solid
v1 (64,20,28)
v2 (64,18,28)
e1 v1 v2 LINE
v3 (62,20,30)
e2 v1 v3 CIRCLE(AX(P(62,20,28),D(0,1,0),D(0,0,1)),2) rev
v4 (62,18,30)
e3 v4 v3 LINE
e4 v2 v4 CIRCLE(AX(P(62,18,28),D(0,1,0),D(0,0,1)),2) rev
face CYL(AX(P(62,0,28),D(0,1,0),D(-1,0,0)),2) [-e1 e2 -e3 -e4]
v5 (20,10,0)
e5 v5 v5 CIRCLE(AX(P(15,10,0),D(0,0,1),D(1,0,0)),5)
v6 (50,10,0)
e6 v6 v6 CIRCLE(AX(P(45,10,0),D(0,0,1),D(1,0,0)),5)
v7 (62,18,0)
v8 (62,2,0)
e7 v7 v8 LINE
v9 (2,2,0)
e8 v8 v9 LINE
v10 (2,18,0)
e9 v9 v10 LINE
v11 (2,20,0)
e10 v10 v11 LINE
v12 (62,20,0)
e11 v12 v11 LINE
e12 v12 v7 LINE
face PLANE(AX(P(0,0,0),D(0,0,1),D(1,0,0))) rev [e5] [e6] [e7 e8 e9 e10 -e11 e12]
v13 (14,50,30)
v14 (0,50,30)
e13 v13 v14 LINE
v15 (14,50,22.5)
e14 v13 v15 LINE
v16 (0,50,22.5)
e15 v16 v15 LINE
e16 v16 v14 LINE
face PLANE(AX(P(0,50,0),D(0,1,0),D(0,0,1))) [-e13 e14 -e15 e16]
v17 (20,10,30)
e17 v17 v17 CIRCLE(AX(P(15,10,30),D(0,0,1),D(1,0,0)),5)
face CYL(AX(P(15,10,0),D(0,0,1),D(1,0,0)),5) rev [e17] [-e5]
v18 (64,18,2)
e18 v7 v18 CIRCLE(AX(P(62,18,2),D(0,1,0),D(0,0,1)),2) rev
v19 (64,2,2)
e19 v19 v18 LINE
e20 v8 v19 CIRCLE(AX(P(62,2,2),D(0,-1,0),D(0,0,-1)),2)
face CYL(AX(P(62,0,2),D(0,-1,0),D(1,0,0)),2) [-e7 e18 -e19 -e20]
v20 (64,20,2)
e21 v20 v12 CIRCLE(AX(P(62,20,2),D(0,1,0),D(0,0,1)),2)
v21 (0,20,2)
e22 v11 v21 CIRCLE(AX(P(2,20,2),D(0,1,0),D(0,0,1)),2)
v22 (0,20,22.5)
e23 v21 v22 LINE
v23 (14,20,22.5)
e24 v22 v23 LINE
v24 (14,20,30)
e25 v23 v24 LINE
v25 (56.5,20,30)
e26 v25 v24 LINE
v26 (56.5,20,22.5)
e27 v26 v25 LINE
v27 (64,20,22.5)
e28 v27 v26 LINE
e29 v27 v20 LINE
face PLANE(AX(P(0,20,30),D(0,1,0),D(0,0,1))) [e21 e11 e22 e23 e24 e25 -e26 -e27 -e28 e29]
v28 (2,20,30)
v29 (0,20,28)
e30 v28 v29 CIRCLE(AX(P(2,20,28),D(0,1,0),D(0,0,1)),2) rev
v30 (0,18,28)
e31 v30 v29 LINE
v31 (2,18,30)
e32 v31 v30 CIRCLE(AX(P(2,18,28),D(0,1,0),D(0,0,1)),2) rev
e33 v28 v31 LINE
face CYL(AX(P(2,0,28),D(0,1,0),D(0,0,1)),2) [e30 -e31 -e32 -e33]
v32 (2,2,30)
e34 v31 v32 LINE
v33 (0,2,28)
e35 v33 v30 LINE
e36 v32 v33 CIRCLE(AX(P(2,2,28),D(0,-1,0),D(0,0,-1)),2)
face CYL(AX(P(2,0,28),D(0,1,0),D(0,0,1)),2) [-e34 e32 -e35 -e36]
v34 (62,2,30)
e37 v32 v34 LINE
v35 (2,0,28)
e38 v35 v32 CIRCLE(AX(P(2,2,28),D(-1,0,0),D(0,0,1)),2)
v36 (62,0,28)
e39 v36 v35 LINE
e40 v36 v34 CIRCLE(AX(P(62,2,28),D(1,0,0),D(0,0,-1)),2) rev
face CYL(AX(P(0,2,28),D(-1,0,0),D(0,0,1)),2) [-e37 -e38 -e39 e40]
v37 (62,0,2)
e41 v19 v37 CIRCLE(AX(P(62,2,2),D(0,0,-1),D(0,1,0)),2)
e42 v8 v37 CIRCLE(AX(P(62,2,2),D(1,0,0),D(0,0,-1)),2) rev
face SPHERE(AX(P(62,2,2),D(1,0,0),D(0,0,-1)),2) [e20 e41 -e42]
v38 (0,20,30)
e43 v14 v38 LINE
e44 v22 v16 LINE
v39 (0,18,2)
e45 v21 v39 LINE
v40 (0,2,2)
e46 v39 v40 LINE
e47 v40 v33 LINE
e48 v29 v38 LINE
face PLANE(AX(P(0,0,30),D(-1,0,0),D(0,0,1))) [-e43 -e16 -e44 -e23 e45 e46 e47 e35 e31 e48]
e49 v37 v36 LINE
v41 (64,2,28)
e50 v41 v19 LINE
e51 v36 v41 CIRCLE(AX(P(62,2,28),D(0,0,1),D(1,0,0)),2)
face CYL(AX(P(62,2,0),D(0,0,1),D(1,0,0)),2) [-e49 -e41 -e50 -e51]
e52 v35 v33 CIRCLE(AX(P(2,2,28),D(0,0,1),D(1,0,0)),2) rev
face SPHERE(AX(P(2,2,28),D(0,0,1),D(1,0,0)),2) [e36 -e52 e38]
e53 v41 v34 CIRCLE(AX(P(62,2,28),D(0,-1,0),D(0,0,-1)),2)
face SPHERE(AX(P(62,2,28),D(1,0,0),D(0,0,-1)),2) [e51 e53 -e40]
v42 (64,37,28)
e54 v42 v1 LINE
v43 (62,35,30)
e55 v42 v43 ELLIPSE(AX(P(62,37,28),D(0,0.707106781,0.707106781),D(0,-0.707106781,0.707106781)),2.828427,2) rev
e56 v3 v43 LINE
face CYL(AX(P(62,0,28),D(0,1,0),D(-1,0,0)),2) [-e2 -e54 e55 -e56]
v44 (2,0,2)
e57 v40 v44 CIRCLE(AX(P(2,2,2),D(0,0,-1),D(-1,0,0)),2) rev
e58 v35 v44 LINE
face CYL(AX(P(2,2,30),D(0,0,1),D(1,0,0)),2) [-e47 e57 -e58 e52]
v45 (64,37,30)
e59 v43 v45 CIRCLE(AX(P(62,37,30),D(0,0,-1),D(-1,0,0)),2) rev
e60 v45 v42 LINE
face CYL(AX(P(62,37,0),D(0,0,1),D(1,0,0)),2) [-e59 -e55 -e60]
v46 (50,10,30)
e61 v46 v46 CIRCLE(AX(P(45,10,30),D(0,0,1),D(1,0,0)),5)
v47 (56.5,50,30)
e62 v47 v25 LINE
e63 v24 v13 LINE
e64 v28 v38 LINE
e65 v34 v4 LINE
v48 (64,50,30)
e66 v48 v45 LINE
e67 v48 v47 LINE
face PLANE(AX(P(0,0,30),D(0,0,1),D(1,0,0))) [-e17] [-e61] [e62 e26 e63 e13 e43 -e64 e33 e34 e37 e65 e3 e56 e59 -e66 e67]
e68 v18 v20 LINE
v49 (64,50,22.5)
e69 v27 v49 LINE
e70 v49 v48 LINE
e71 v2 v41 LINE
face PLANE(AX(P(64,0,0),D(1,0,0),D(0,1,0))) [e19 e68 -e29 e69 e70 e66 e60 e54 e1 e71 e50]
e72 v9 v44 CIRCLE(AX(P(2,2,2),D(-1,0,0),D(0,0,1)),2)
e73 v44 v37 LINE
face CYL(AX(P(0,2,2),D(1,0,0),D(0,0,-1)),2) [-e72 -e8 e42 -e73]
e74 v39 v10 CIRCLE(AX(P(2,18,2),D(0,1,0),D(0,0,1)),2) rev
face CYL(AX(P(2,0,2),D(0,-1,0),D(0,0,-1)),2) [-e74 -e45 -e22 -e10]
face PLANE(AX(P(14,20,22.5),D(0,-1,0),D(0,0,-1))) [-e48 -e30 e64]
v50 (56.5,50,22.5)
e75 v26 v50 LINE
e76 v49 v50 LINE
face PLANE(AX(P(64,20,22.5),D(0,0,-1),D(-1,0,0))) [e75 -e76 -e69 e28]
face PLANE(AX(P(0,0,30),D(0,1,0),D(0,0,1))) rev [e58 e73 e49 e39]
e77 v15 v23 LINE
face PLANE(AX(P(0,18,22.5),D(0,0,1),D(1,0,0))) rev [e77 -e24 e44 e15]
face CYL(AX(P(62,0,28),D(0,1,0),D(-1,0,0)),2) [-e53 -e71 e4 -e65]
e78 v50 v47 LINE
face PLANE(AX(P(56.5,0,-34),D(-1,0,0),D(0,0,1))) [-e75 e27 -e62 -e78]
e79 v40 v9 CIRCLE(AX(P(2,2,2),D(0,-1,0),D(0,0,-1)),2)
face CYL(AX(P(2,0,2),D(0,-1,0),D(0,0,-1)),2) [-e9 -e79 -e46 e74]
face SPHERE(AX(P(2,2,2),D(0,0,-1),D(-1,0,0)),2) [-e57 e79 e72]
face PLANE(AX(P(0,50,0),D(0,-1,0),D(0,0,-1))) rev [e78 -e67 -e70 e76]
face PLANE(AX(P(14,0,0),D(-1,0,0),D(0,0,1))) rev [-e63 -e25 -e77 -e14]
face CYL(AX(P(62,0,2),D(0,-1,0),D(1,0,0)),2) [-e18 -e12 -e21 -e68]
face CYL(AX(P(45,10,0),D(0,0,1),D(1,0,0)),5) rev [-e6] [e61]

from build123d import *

# Parameters (mm, degrees)
EXTRUDE_1_DEPTH     = 30
SKETCH_2_R          = 5
CUT_EXTRUDE_1_DEPTH = 71
EXTRUDE_6_DEPTH     = 20
SKETCH_3_7_W        = 4.398
SKETCH_3_7_H        = 10.5
SKETCH_3_7_H_2      = 3.285510203
EXTRUDE_7_DEPTH     = 30
SKETCH_5_W          = 2.915886522
SKETCH_5_H          = 13.785510203
EXTRUDE_8_DEPTH     = 30
SKETCH_6_W          = 7.313886522
SKETCH_6_H          = 15
SKETCH_6_W_2        = 5
EXTRUDE_9_DEPTH     = 10
SKETCH_7_W          = 3.04
SKETCH_7_H          = 13
EXTRUDE_10_DEPTH    = 30
SKETCH_8_W          = 3.04
SKETCH_8_H          = 15
EXTRUDE_11_DEPTH    = 10
SKETCH_10_W         = 2.5
SKETCH_10_H         = 23
SKETCH_10_W_2       = 5.602
SKETCH_10_H_2       = 23.785510203
EXTRUDE_12_DEPTH    = 15
SKETCH_11_W         = 5.602
SKETCH_11_H         = 13.785510203
EXTRUDE_13_DEPTH    = 15
SKETCH_13_W         = 2.5
SKETCH_13_H         = 13
EXTRUDE_14_DEPTH    = 15
FILLET_1_R          = 2
SKETCH_14_W         = 4.252343595
SKETCH_14_H         = 32
CUT_EXTRUDE_2_DEPTH = 12
SKETCH_15_W         = 12
SKETCH_15_H         = 6.952343595
EXTRUDE_15_DEPTH    = 2
FILLET_2_R          = 2
CUT_EXTRUDE_3_DEPTH = 32
SKETCH_17_W         = 12.915886522
SKETCH_17_H         = 7.23748014
EXTRUDE_17_DEPTH    = 2
FILLET_3_R          = 2
SKETCH_20_W         = 10.54
SKETCH_20_H         = 0.8
CUT_EXTRUDE_4_DEPTH = 30
FILLET_5_R          = 2
SKETCH_21_W         = 10.244070675
SKETCH_21_H         = 15
CUT_EXTRUDE_5_DEPTH = 64
CUT_EXTRUDE_6_DEPTH = 64
SKETCH_23_W         = 64
SKETCH_23_H         = 30
EXTRUDE_18_DEPTH    = 2
FILLET_7_R          = 2
EXTRUDE_START       = 20
EXTRUDE_19_DEPTH    = 30


# Read off the part's stored shape, not the designer's step: 凸台-拉伸19
with BuildPart() as part:
    # 草图1 → 凸台-拉伸1 (new body)
    with BuildSketch(Plane.XY):
        Polygon((0, 20), (0, 0), (60, 0), (60, 20), (30, 20), align=None)
    extrude(amount=EXTRUDE_1_DEPTH)

    # 草图2 → 切除-拉伸1 (cut, through all)
    with BuildSketch(Plane.XY.offset(30)):
        with Locations((15, 10)):
            Circle(SKETCH_2_R)
        with Locations((45, 10)):
            Circle(SKETCH_2_R)
    extrude(amount=-CUT_EXTRUDE_1_DEPTH, mode=Mode.SUBTRACT)

    # 草图3 → 凸台-拉伸6 (add)
    with BuildSketch(Plane(origin=(0, 20, 0), x_dir=(1, 0, 0), z_dir=(0, 1, 0))):
        Polygon((60.96, -17), (60.96, -30), (64, -30), (64, 0), (60, 0), (60, -17), align=None)
        Polygon((60, -19.5), (60, -30), (60.96, -30), (60.96, -17), (60, -17), align=None)
    extrude(amount=-EXTRUDE_6_DEPTH)

    # 草图3<7> → 凸台-拉伸7 (add)
    with BuildSketch(Plane(origin=(0, 20, 0), x_dir=(1, 0, 0), z_dir=(0, 1, 0))):
        with Locations((7.801, -24.75)):
            Rectangle(SKETCH_3_7_W, SKETCH_3_7_H)
        with Locations((7.801, -17.857244898)):
            Rectangle(SKETCH_3_7_W, SKETCH_3_7_H_2)
        Polygon((60.96, -17), (60.96, -30), (55.96, -30), (55.96, -17), (58.46, -17), align=None)
    extrude(amount=EXTRUDE_7_DEPTH)

    # 草图5 → 凸台-拉伸8 (add)
    with BuildSketch(Plane(origin=(0, 20, 0), x_dir=(1, 0, 0), z_dir=(0, 1, 0))):
        with Locations((11.457943261, -23.107244899)):
            Rectangle(SKETCH_5_W, SKETCH_5_H)
    extrude(amount=EXTRUDE_8_DEPTH)

    # 草图6 → 凸台-拉伸9 (add)
    with BuildSketch(Plane.XY.offset(30)):
        with Locations((9.258943261, 42.5)):
            Rectangle(SKETCH_6_W, SKETCH_6_H)
        with Locations((58.46, 42.5)):
            Rectangle(SKETCH_6_W_2, SKETCH_6_H)
    extrude(amount=EXTRUDE_9_DEPTH)

    # 草图7 → 凸台-拉伸10 (add)
    with BuildSketch(Plane(origin=(0, 20, 0), x_dir=(1, 0, 0), z_dir=(0, 1, 0))):
        with Locations((62.48, -23.5)):
            Rectangle(SKETCH_7_W, SKETCH_7_H)
    extrude(amount=EXTRUDE_10_DEPTH)

    # 草图8 → 凸台-拉伸11 (add)
    with BuildSketch(Plane.XY.offset(30)):
        with Locations((62.48, 42.5)):
            Rectangle(SKETCH_8_W, SKETCH_8_H)
    extrude(amount=EXTRUDE_11_DEPTH)

    # 草图10 → 凸台-拉伸12 (add)
    with BuildSketch(Plane(origin=(0, 50, 0), x_dir=(1, 0, 0), z_dir=(0, 1, 0))):
        with Locations((54.71, -28.5)):
            Rectangle(SKETCH_10_W, SKETCH_10_H)
        with Locations((2.801, -28.107244898)):
            Rectangle(SKETCH_10_W_2, SKETCH_10_H_2)
    extrude(amount=-EXTRUDE_12_DEPTH)

    # 草图11 → 凸台-拉伸13 (add)
    with BuildSketch(Plane(origin=(0, 20, 0), x_dir=(1, 0, 0), z_dir=(0, 1, 0))):
        with Locations((2.801, -23.107244899)):
            Rectangle(SKETCH_11_W, SKETCH_11_H)
    extrude(amount=EXTRUDE_13_DEPTH)

    # 草图13 → 凸台-拉伸14 (add)
    with BuildSketch(Plane.XZ.offset(-35)):
        with Locations((54.71, 23.5)):
            Rectangle(SKETCH_13_W, SKETCH_13_H)
    extrude(amount=EXTRUDE_14_DEPTH)

    # 圆角1
    fillet_1_edges = [part.edges().sort_by_distance(p)[0] for p in [
        (64, 20, 8.5),
        (64, 35, 17),
        (64, 35, 35),
        (64, 42.5, 40),
        (53.46, 42.5, 40),
        (53.46, 35, 17),
        (0, 42.5, 40),
        (0, 35, 16.214489797),
        (0, 35, 35),
        (0, 20, 8.107244899),
        (53.46, 35, 35),
        (53.46, 27.5, 30),
        (0, 17.5, 30),
        (64, 0, 15),
        (64, 10, 0),
        (64, 17.5, 30),
        (0, 10, 0),
        (32, 0, 30),
        (32, 20, 0),
        (33.187943261, 20, 30),
        (12.915886522, 35, 16.214489797),
        (32, 0, 0),
        (12.915886522, 27.5, 30),
        (12.915886522, 35, 35),
        (12.915886522, 42.5, 40),
        (6.457943261, 50, 40),
        (6.457943261, 35, 40),
        (0, 0, 15),
        (58.73, 35, 40),
        (58.73, 50, 40),
    ]]
    fillet(fillet_1_edges, radius=FILLET_1_R)

    # 草图14 → 切除-拉伸2 (cut)
    with BuildSketch(Plane(origin=(64, 0, 0), x_dir=(0, 0, -1), z_dir=(1, 0, 0))):
        with Locations((-16.873828203, 34)):
            Rectangle(SKETCH_14_W, SKETCH_14_H)
        Polygon((-21.7, 50), (-21.7, 37), (-21.7, 18), (-19, 18), (-19, 50), align=None)
    extrude(amount=-CUT_EXTRUDE_2_DEPTH, mode=Mode.SUBTRACT)

    # 草图15 → 凸台-拉伸15 (add)
    with BuildSketch(Plane(origin=(0, 18, 0), x_dir=(1, 0, 0), z_dir=(0, 1, 0))):
        with Locations((58, -18.223828203)):
            Rectangle(SKETCH_15_W, SKETCH_15_H)
    extrude(amount=EXTRUDE_15_DEPTH)

    # 圆角2
    fillet_2_edges = [part.edges().sort_by_distance(p)[0] for p in [
        (64, 20, 18.223828202),
    ]]
    fillet(fillet_2_edges, radius=FILLET_2_R)

    # 草图16 → 切除-拉伸3 (cut)
    with BuildSketch(Plane(origin=(0, 50, 0), x_dir=(1, 0, 0), z_dir=(0, 1, 0))):
        with BuildLine():
            Line((0, -18.214489797), (0, -22.5))
            Line((0, -22.5), (12.915886522, -22.5))
            Line((12.915886522, -22.5), (12.915886522, -18.214489797))
            ThreePointArc((12.915886522, -18.214489797), (12.330100084, -16.800276235), (10.915886522, -16.214489797))
            Line((10.915886522, -16.214489797), (2, -16.214489797))
            ThreePointArc((2, -16.214489797), (0.585786438, -16.800276235), (0, -18.214489797))
        make_face()
        with BuildLine():
            Line((-1.657142537, -22.5), (0, -22.5))
            Line((0, -22.5), (0, -18.214489797))
            ThreePointArc((0, -18.214489797), (0.585786438, -16.800276235), (2, -16.214489797))
            Line((2, -16.214489797), (10.915886522, -16.214489797))
            ThreePointArc((10.915886522, -16.214489797), (12.330100084, -16.800276235), (12.915886522, -18.214489797))
            Line((12.915886522, -18.214489797), (12.915886522, -15.26251986))
            Line((12.915886522, -15.26251986), (-1.657142537, -15.26251986))
            Line((-1.657142537, -15.26251986), (-1.657142537, -22.5))
        make_face()
    extrude(amount=-CUT_EXTRUDE_3_DEPTH, mode=Mode.SUBTRACT)

    # 草图17 → 凸台-拉伸17 (add)
    with BuildSketch(Plane(origin=(0, 18, 0), x_dir=(1, 0, 0), z_dir=(0, 1, 0))):
        with Locations((6.457943261, -18.88125993)):
            Rectangle(SKETCH_17_W, SKETCH_17_H)
    extrude(amount=EXTRUDE_17_DEPTH)

    # 圆角3
    fillet_3_edges = [part.edges().sort_by_distance(p)[0] for p in [
        (0, 20, 18.88125993),
    ]]
    fillet(fillet_3_edges, radius=FILLET_3_R)

    # 草图20 → 切除-拉伸4 (cut)
    with BuildSketch(Plane(origin=(0, 50, 0), x_dir=(1, 0, 0), z_dir=(0, 1, 0))):
        with Locations((58.73, -22.1)):
            Rectangle(SKETCH_20_W, SKETCH_20_H)
    extrude(amount=-CUT_EXTRUDE_4_DEPTH, mode=Mode.SUBTRACT)

    # 圆角5
    fillet_5_edges = [part.edges().sort_by_distance(p)[0] for p in [
        (64, 20, 22.1),
    ]]
    fillet(fillet_5_edges, radius=FILLET_5_R - 0.0001)  # a hair under: the kernel refuses the full size

    # 草图21 → 切除-拉伸5 (cut)
    with BuildSketch(Plane.ZY):
        with Locations((35.122035338, 42.5)):
            Rectangle(SKETCH_21_W, SKETCH_21_H)
    extrude(amount=-CUT_EXTRUDE_5_DEPTH, mode=Mode.SUBTRACT)

    # 草图22 → 切除-拉伸6 (cut)
    with BuildSketch(Plane.XY.offset(30)):
        with BuildLine():
            Line((56.5, 20), (56.5, 37))
            Line((56.5, 37), (56.5, 50))
            Line((56.5, 50), (53.46, 50))
            Line((53.46, 50), (53.46, 37))
            ThreePointArc((53.46, 37), (54.045786438, 35.585786438), (55.46, 35))
            Line((55.46, 35), (55.46, 20))
            Line((55.46, 20), (56.5, 20))
        make_face()
        with BuildLine():
            Line((53.46, 20), (55.46, 20))
            Line((55.46, 20), (55.46, 35))
            ThreePointArc((55.46, 35), (54.045786438, 35.585786438), (53.46, 37))
            Line((53.46, 37), (53.46, 20))
        make_face()
    extrude(amount=-CUT_EXTRUDE_6_DEPTH, mode=Mode.SUBTRACT)

    # 草图23 → 凸台-拉伸18 (add)
    with BuildSketch(Plane(origin=(0, 20, 0), x_dir=(1, 0, 0), z_dir=(0, 1, 0))):
        with Locations((32, -15)):
            Rectangle(SKETCH_23_W, SKETCH_23_H)
    extrude(amount=-EXTRUDE_18_DEPTH)

    # 圆角7
    fillet_7_edges = [part.edges().sort_by_distance(p)[0] for p in [
        (0, 19, 0),
        (64, 19, 0),
        (64, 19, 30),
        (0, 19, 30),
    ]]
    fillet(fillet_7_edges, radius=FILLET_7_R)

    # 凸台-拉伸19 outline → 凸台-拉伸19 (add)
    with BuildSketch(Plane(origin=(0, 0, 0), x_dir=(1, 0, 0), z_dir=(0, 1, 0)).offset(EXTRUDE_START)):
        with BuildLine():
            Line((14, -30), (14, -22.5))
            Line((14, -22.5), (12.915886522, -22.5))
            Line((12.915886522, -22.5), (12.915886522, -28))
            ThreePointArc((12.915886522, -28), (12.330100084, -29.414213562), (10.915886522, -30))
            Line((10.915886522, -30), (14, -30))
        make_face()
        with BuildLine():
            ThreePointArc((2, -30), (0.585786438, -29.414213562), (0, -28))
            Line((0, -28), (0, -30))
            Line((0, -30), (2, -30))
        make_face()
    extrude(amount=EXTRUDE_19_DEPTH)


solid = part.part
